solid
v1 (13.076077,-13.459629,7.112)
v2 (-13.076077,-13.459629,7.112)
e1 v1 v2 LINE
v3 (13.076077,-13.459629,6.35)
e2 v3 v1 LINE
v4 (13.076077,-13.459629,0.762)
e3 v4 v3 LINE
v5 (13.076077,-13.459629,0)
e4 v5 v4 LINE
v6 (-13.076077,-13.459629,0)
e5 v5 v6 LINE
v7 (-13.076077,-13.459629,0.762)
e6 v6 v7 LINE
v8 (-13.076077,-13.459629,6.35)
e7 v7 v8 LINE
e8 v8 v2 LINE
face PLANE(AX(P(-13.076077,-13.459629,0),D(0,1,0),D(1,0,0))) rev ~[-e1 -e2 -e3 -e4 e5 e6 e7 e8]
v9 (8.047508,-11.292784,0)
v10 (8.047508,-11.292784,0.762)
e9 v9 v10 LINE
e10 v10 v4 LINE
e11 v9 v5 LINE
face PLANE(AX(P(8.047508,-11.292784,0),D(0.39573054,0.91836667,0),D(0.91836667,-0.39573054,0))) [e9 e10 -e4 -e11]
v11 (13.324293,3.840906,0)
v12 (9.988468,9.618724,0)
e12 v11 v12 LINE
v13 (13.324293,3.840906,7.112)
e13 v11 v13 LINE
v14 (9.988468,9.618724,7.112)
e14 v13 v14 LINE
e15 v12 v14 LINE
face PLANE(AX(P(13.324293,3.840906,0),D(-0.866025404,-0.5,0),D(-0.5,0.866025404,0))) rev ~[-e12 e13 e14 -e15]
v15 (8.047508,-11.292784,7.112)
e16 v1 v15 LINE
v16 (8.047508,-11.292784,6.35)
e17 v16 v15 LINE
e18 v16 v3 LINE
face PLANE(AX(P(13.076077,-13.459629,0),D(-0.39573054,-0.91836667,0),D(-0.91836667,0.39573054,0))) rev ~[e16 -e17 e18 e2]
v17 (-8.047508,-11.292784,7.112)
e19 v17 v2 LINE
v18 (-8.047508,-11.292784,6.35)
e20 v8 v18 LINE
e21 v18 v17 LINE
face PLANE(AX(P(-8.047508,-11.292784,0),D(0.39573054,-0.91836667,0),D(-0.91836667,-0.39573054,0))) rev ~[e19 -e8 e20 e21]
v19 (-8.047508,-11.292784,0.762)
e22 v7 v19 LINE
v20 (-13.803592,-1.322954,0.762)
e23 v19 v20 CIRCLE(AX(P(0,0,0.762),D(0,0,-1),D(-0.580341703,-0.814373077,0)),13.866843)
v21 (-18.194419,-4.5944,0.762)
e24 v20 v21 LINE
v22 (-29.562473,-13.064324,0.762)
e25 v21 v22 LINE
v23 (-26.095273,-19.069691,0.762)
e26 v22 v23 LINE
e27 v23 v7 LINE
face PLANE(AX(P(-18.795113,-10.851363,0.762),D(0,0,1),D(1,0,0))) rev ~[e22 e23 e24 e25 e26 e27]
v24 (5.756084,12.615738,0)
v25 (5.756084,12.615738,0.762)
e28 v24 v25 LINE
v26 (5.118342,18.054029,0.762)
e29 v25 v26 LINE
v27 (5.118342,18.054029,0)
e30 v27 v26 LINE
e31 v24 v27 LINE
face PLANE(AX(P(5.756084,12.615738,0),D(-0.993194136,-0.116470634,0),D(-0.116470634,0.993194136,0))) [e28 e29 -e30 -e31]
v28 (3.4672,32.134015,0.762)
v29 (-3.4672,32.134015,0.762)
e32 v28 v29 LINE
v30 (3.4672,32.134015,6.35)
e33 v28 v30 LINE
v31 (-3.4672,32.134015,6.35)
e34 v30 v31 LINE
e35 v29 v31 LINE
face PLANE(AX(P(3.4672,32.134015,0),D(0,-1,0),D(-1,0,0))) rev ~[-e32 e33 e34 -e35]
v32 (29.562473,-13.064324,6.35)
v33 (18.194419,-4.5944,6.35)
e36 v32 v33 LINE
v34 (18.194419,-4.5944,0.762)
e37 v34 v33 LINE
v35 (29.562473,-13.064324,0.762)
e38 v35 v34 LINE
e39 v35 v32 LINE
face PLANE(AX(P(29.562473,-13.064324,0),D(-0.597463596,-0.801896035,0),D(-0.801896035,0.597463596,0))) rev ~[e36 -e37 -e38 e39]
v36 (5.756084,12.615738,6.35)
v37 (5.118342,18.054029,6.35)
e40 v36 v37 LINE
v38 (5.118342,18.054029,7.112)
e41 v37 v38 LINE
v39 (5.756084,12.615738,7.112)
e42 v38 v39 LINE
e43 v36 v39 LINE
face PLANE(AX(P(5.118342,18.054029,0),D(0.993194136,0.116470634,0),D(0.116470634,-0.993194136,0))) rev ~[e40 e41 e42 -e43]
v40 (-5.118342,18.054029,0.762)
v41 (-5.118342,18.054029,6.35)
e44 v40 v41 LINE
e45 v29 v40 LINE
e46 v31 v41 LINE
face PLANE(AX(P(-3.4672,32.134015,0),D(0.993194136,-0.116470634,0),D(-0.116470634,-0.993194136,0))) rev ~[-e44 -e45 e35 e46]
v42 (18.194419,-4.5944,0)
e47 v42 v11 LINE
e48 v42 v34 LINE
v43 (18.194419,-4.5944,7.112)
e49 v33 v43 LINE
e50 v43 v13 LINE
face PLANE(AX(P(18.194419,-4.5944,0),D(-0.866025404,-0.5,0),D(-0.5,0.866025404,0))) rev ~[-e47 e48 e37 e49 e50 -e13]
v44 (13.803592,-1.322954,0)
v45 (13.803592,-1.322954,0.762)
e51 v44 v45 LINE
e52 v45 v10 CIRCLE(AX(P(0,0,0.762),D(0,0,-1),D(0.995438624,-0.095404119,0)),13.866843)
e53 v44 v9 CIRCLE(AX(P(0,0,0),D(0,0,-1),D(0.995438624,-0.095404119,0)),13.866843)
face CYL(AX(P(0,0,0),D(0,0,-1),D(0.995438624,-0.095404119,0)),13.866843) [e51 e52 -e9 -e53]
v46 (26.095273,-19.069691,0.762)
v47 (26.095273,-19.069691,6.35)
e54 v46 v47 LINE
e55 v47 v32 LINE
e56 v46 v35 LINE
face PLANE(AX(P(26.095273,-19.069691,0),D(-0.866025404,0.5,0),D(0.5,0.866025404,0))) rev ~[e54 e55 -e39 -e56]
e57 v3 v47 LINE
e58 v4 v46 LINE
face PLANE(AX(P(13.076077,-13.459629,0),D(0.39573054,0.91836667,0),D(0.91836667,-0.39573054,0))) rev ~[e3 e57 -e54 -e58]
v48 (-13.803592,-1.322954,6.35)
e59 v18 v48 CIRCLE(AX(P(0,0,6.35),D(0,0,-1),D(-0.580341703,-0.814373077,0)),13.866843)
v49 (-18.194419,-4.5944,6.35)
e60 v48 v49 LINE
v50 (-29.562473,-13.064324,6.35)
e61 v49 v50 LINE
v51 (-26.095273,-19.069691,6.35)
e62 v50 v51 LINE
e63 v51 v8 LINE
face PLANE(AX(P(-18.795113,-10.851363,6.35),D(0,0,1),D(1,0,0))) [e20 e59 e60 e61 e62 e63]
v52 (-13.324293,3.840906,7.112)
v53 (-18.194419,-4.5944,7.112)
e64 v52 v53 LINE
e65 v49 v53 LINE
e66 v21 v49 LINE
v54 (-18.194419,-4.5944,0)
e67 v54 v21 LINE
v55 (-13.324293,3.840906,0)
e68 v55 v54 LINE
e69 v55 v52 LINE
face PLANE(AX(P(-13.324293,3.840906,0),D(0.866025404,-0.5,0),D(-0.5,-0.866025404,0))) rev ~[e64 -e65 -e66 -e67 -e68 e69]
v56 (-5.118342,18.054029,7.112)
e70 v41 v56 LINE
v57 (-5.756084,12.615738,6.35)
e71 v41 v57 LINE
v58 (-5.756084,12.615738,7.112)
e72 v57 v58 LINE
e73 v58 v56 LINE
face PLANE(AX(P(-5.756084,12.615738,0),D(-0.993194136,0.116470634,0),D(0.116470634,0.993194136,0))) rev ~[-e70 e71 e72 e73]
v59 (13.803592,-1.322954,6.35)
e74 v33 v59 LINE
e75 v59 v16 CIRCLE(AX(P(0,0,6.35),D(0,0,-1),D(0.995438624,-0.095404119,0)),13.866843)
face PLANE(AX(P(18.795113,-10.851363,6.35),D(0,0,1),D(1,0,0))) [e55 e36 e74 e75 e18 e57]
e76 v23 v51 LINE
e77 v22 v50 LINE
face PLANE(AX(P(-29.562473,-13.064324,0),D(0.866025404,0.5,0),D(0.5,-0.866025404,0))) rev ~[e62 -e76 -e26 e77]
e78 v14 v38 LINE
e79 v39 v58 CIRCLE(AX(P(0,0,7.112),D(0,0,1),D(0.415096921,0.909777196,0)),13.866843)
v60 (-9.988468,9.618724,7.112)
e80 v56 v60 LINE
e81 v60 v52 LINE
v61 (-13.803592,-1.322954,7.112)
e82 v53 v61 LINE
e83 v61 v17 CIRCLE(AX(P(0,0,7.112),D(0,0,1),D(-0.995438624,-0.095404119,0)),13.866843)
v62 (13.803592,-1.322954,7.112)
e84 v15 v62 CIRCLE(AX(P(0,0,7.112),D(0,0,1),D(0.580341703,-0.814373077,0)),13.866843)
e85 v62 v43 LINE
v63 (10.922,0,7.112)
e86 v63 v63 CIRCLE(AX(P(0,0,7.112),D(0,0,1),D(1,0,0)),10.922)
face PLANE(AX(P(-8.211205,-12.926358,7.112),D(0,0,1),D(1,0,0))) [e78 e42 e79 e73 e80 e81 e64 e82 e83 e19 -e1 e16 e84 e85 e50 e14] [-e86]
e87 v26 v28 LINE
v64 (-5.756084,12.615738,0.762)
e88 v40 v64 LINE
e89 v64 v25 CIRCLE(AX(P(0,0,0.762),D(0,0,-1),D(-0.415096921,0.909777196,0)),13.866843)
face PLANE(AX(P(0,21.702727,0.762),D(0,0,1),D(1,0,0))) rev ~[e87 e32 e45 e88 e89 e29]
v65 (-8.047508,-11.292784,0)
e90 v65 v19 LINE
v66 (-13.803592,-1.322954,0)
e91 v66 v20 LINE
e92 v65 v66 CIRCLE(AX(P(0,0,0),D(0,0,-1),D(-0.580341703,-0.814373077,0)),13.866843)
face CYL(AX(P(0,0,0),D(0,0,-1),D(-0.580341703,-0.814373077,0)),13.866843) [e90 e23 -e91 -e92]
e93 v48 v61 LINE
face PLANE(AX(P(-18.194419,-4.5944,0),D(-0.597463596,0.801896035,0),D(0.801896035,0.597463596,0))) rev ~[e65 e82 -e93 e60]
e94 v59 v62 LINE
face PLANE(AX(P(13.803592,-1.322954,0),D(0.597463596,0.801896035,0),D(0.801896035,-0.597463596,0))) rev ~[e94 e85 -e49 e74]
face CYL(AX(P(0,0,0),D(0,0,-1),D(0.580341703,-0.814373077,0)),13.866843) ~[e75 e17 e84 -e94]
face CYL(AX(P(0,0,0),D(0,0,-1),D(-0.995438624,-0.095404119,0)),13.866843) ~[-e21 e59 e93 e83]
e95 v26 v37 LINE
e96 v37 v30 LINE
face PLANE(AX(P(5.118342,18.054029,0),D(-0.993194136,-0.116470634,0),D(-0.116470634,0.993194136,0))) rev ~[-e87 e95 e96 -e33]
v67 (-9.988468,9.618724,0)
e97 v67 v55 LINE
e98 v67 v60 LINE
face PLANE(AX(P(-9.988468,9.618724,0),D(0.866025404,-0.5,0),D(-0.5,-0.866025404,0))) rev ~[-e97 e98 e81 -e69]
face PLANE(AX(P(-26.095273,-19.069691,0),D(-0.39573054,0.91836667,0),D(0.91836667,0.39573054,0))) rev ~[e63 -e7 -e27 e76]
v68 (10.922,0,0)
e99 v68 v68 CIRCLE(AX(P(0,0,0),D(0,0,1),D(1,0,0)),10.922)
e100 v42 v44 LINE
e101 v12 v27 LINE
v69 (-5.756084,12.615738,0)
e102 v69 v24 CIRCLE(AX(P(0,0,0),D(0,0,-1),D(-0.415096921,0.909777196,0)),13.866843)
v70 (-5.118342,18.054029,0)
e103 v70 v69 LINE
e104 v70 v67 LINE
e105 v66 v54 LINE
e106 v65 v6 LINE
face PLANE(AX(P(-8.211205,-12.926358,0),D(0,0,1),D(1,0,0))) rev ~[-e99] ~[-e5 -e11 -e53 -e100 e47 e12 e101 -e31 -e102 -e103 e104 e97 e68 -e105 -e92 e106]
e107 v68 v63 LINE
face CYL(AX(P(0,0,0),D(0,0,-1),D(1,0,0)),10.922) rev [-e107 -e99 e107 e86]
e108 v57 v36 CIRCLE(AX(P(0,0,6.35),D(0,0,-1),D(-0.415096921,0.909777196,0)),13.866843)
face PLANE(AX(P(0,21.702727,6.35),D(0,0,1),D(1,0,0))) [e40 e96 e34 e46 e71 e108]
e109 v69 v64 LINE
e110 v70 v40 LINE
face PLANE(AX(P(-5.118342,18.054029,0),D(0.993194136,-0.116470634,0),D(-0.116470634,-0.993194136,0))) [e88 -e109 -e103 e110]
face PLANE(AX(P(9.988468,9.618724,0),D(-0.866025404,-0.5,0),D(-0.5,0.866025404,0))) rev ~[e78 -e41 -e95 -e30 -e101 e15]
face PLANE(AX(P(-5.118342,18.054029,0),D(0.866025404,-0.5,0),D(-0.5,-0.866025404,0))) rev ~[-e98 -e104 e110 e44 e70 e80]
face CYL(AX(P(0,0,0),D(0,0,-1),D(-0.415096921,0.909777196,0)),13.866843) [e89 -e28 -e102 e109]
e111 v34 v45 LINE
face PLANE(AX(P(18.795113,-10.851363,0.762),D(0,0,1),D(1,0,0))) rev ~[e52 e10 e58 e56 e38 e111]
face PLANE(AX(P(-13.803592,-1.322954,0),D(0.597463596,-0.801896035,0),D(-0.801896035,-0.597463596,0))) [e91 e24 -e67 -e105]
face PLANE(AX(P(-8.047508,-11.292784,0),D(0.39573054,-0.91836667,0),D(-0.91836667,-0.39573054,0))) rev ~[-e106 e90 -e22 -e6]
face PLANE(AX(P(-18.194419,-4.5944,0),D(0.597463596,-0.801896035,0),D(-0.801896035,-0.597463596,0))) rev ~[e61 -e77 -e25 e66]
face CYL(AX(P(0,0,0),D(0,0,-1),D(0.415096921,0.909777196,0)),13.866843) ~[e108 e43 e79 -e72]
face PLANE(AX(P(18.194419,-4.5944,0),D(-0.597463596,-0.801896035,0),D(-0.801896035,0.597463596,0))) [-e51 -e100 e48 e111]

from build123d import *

# Parameters (mm, degrees)
F0_R     = 10.922
F1_DEPTH = 7.112
F2_DEPTH = 6.35
F3_DEPTH = 0.762
F4_DEPTH = 7.112


with BuildPart() as f1:
    # F0 (on Top) → F1 (new body)
    with BuildSketch(Plane.XY):
        with BuildLine():
            Line((-5.7560840378, 12.6157379826), (-5.1183423957, 18.0540294813))
            Line((-5.1183423957, 18.0540294813), (-9.9884684203, 9.6187237673))
            ThreePointArc((-9.9884684203, 9.6187237673), (-8.0136294261, 11.3168499026), (-5.7560840378, 12.6157379826))
        make_face()
        with BuildLine():
            ThreePointArc((5.7560840378, 12.6157379826), (0, 13.8668434871), (-5.7560840378, 12.6157379826))
            ThreePointArc((-5.7560840378, 12.6157379826), (-8.0136294261, 11.3168499026), (-9.9884684203, 9.6187237673))
            Line((-9.9884684203, 9.6187237673), (-13.3242933447, 3.8409055132))
            ThreePointArc((-13.3242933447, 3.8409055132), (-13.8074942195, 1.2815817082), (-13.8035915993, -1.3229539883))
            ThreePointArc((-13.8035915993, -1.3229539883), (-12.0090387301, -6.9334217436), (-8.0475075615, -11.2927839943))
            ThreePointArc((-8.0475075615, -11.2927839943), (-5.7938647934, -12.5984316108), (-3.3358249243, -13.4596292806))
            Line((-3.3358249243, -13.4596292806), (3.3358249243, -13.4596292806))
            ThreePointArc((3.3358249243, -13.4596292806), (5.7938647934, -12.5984316108), (8.0475075615, -11.2927839943))
            ThreePointArc((8.0475075615, -11.2927839943), (12.0090387301, -6.9334217436), (13.8035915993, -1.3229539883))
            ThreePointArc((13.8035915993, -1.3229539883), (13.8510214888, -0.6622325982), (13.8668434871, 0))
            ThreePointArc((13.8668434871, 0), (13.730536018, 1.9395177119), (13.3242933447, 3.8409055132))
            Line((13.3242933447, 3.8409055132), (9.9884684203, 9.6187237673))
            ThreePointArc((9.9884684203, 9.6187237673), (8.0136294261, 11.3168499026), (5.7560840378, 12.6157379826))
        make_face()
        Circle(F0_R, mode=Mode.SUBTRACT)
        with BuildLine():
            Line((5.1183423957, 18.0540294813), (5.7560840378, 12.6157379826))
            ThreePointArc((5.7560840378, 12.6157379826), (8.0136294261, 11.3168499026), (9.9884684203, 9.6187237673))
            Line((9.9884684203, 9.6187237673), (5.1183423957, 18.0540294813))
        make_face()
        with BuildLine():
            ThreePointArc((-13.8035915993, -1.3229539883), (-13.8074942195, 1.2815817082), (-13.3242933447, 3.8409055132))
            Line((-13.3242933447, 3.8409055132), (-18.1944193693, -4.5944002008))
            Line((-18.1944193693, -4.5944002008), (-13.8035915993, -1.3229539883))
        make_face()
        with BuildLine():
            Line((18.1944193693, -4.5944002008), (13.3242933447, 3.8409055132))
            ThreePointArc((13.3242933447, 3.8409055132), (13.730536018, 1.9395177119), (13.8668434871, 0))
            ThreePointArc((13.8668434871, 0), (13.8510214888, -0.6622325982), (13.8035915993, -1.3229539883))
            Line((13.8035915993, -1.3229539883), (18.1944193693, -4.5944002008))
        make_face()
        with BuildLine():
            ThreePointArc((8.0475075615, -11.2927839943), (5.7938647934, -12.5984316108), (3.3358249243, -13.4596292806))
            Line((3.3358249243, -13.4596292806), (13.0760769737, -13.4596292806))
            Line((13.0760769737, -13.4596292806), (8.0475075615, -11.2927839943))
        make_face()
    extrude(amount=F1_DEPTH)

    # F0 (on Top) → F2 (join)
    with BuildSketch(Plane.XY):
        with BuildLine():
            ThreePointArc((-8.0475075615, -11.2927839943), (-12.0090387301, -6.9334217436), (-13.8035915993, -1.3229539883))
            Line((-13.8035915993, -1.3229539883), (-18.1944193693, -4.5944002008))
            Line((-18.1944193693, -4.5944002008), (-29.5624734591, -13.0643241977))
            Line((-29.5624734591, -13.0643241977), (-26.095273368, -19.0696909155))
            Line((-26.095273368, -19.0696909155), (-13.0760769737, -13.4596292806))
            Line((-13.0760769737, -13.4596292806), (-8.0475075615, -11.2927839943))
        make_face()
        with BuildLine():
            Line((-3.4672000911, 32.1340151131), (-5.1183423957, 18.0540294813))
            Line((-5.1183423957, 18.0540294813), (-5.7560840378, 12.6157379826))
            ThreePointArc((-5.7560840378, 12.6157379826), (0, 13.8668434871), (5.7560840378, 12.6157379826))
            Line((5.7560840378, 12.6157379826), (5.1183423957, 18.0540294813))
            Line((5.1183423957, 18.0540294813), (3.4672000911, 32.1340151131))
            Line((3.4672000911, 32.1340151131), (-3.4672000911, 32.1340151131))
        make_face()
        with BuildLine():
            Line((29.5624734591, -13.0643241977), (18.1944193693, -4.5944002008))
            Line((18.1944193693, -4.5944002008), (13.8035915993, -1.3229539883))
            ThreePointArc((13.8035915993, -1.3229539883), (12.0090387301, -6.9334217436), (8.0475075615, -11.2927839943))
            Line((8.0475075615, -11.2927839943), (13.0760769737, -13.4596292806))
            Line((13.0760769737, -13.4596292806), (26.095273368, -19.0696909155))
            Line((26.095273368, -19.0696909155), (29.5624734591, -13.0643241977))
        make_face()
    extrude(amount=F2_DEPTH)

    # F0 (on Top) → F3 (cut)
    with BuildSketch(Plane.XY):
        with BuildLine():
            Line((29.5624734591, -13.0643241977), (18.1944193693, -4.5944002008))
            Line((18.1944193693, -4.5944002008), (13.8035915993, -1.3229539883))
            ThreePointArc((13.8035915993, -1.3229539883), (12.0090387301, -6.9334217436), (8.0475075615, -11.2927839943))
            Line((8.0475075615, -11.2927839943), (13.0760769737, -13.4596292806))
            Line((13.0760769737, -13.4596292806), (26.095273368, -19.0696909155))
            Line((26.095273368, -19.0696909155), (29.5624734591, -13.0643241977))
        make_face()
        with BuildLine():
            Line((-3.4672000911, 32.1340151131), (-5.1183423957, 18.0540294813))
            Line((-5.1183423957, 18.0540294813), (-5.7560840378, 12.6157379826))
            ThreePointArc((-5.7560840378, 12.6157379826), (0, 13.8668434871), (5.7560840378, 12.6157379826))
            Line((5.7560840378, 12.6157379826), (5.1183423957, 18.0540294813))
            Line((5.1183423957, 18.0540294813), (3.4672000911, 32.1340151131))
            Line((3.4672000911, 32.1340151131), (-3.4672000911, 32.1340151131))
        make_face()
        with BuildLine():
            ThreePointArc((-8.0475075615, -11.2927839943), (-12.0090387301, -6.9334217436), (-13.8035915993, -1.3229539883))
            Line((-13.8035915993, -1.3229539883), (-18.1944193693, -4.5944002008))
            Line((-18.1944193693, -4.5944002008), (-29.5624734591, -13.0643241977))
            Line((-29.5624734591, -13.0643241977), (-26.095273368, -19.0696909155))
            Line((-26.095273368, -19.0696909155), (-13.0760769737, -13.4596292806))
            Line((-13.0760769737, -13.4596292806), (-8.0475075615, -11.2927839943))
        make_face()
    extrude(amount=F3_DEPTH, mode=Mode.SUBTRACT)

    # F0 (on Top) → F4 (join)
    with BuildSketch(Plane.XY):
        with BuildLine():
            ThreePointArc((-3.3358249243, -13.4596292806), (-5.7938647934, -12.5984316108), (-8.0475075615, -11.2927839943))
            Line((-8.0475075615, -11.2927839943), (-13.0760769737, -13.4596292806))
            Line((-13.0760769737, -13.4596292806), (-3.3358249243, -13.4596292806))
        make_face()
    extrude(amount=F4_DEPTH)


solid = f1.part
